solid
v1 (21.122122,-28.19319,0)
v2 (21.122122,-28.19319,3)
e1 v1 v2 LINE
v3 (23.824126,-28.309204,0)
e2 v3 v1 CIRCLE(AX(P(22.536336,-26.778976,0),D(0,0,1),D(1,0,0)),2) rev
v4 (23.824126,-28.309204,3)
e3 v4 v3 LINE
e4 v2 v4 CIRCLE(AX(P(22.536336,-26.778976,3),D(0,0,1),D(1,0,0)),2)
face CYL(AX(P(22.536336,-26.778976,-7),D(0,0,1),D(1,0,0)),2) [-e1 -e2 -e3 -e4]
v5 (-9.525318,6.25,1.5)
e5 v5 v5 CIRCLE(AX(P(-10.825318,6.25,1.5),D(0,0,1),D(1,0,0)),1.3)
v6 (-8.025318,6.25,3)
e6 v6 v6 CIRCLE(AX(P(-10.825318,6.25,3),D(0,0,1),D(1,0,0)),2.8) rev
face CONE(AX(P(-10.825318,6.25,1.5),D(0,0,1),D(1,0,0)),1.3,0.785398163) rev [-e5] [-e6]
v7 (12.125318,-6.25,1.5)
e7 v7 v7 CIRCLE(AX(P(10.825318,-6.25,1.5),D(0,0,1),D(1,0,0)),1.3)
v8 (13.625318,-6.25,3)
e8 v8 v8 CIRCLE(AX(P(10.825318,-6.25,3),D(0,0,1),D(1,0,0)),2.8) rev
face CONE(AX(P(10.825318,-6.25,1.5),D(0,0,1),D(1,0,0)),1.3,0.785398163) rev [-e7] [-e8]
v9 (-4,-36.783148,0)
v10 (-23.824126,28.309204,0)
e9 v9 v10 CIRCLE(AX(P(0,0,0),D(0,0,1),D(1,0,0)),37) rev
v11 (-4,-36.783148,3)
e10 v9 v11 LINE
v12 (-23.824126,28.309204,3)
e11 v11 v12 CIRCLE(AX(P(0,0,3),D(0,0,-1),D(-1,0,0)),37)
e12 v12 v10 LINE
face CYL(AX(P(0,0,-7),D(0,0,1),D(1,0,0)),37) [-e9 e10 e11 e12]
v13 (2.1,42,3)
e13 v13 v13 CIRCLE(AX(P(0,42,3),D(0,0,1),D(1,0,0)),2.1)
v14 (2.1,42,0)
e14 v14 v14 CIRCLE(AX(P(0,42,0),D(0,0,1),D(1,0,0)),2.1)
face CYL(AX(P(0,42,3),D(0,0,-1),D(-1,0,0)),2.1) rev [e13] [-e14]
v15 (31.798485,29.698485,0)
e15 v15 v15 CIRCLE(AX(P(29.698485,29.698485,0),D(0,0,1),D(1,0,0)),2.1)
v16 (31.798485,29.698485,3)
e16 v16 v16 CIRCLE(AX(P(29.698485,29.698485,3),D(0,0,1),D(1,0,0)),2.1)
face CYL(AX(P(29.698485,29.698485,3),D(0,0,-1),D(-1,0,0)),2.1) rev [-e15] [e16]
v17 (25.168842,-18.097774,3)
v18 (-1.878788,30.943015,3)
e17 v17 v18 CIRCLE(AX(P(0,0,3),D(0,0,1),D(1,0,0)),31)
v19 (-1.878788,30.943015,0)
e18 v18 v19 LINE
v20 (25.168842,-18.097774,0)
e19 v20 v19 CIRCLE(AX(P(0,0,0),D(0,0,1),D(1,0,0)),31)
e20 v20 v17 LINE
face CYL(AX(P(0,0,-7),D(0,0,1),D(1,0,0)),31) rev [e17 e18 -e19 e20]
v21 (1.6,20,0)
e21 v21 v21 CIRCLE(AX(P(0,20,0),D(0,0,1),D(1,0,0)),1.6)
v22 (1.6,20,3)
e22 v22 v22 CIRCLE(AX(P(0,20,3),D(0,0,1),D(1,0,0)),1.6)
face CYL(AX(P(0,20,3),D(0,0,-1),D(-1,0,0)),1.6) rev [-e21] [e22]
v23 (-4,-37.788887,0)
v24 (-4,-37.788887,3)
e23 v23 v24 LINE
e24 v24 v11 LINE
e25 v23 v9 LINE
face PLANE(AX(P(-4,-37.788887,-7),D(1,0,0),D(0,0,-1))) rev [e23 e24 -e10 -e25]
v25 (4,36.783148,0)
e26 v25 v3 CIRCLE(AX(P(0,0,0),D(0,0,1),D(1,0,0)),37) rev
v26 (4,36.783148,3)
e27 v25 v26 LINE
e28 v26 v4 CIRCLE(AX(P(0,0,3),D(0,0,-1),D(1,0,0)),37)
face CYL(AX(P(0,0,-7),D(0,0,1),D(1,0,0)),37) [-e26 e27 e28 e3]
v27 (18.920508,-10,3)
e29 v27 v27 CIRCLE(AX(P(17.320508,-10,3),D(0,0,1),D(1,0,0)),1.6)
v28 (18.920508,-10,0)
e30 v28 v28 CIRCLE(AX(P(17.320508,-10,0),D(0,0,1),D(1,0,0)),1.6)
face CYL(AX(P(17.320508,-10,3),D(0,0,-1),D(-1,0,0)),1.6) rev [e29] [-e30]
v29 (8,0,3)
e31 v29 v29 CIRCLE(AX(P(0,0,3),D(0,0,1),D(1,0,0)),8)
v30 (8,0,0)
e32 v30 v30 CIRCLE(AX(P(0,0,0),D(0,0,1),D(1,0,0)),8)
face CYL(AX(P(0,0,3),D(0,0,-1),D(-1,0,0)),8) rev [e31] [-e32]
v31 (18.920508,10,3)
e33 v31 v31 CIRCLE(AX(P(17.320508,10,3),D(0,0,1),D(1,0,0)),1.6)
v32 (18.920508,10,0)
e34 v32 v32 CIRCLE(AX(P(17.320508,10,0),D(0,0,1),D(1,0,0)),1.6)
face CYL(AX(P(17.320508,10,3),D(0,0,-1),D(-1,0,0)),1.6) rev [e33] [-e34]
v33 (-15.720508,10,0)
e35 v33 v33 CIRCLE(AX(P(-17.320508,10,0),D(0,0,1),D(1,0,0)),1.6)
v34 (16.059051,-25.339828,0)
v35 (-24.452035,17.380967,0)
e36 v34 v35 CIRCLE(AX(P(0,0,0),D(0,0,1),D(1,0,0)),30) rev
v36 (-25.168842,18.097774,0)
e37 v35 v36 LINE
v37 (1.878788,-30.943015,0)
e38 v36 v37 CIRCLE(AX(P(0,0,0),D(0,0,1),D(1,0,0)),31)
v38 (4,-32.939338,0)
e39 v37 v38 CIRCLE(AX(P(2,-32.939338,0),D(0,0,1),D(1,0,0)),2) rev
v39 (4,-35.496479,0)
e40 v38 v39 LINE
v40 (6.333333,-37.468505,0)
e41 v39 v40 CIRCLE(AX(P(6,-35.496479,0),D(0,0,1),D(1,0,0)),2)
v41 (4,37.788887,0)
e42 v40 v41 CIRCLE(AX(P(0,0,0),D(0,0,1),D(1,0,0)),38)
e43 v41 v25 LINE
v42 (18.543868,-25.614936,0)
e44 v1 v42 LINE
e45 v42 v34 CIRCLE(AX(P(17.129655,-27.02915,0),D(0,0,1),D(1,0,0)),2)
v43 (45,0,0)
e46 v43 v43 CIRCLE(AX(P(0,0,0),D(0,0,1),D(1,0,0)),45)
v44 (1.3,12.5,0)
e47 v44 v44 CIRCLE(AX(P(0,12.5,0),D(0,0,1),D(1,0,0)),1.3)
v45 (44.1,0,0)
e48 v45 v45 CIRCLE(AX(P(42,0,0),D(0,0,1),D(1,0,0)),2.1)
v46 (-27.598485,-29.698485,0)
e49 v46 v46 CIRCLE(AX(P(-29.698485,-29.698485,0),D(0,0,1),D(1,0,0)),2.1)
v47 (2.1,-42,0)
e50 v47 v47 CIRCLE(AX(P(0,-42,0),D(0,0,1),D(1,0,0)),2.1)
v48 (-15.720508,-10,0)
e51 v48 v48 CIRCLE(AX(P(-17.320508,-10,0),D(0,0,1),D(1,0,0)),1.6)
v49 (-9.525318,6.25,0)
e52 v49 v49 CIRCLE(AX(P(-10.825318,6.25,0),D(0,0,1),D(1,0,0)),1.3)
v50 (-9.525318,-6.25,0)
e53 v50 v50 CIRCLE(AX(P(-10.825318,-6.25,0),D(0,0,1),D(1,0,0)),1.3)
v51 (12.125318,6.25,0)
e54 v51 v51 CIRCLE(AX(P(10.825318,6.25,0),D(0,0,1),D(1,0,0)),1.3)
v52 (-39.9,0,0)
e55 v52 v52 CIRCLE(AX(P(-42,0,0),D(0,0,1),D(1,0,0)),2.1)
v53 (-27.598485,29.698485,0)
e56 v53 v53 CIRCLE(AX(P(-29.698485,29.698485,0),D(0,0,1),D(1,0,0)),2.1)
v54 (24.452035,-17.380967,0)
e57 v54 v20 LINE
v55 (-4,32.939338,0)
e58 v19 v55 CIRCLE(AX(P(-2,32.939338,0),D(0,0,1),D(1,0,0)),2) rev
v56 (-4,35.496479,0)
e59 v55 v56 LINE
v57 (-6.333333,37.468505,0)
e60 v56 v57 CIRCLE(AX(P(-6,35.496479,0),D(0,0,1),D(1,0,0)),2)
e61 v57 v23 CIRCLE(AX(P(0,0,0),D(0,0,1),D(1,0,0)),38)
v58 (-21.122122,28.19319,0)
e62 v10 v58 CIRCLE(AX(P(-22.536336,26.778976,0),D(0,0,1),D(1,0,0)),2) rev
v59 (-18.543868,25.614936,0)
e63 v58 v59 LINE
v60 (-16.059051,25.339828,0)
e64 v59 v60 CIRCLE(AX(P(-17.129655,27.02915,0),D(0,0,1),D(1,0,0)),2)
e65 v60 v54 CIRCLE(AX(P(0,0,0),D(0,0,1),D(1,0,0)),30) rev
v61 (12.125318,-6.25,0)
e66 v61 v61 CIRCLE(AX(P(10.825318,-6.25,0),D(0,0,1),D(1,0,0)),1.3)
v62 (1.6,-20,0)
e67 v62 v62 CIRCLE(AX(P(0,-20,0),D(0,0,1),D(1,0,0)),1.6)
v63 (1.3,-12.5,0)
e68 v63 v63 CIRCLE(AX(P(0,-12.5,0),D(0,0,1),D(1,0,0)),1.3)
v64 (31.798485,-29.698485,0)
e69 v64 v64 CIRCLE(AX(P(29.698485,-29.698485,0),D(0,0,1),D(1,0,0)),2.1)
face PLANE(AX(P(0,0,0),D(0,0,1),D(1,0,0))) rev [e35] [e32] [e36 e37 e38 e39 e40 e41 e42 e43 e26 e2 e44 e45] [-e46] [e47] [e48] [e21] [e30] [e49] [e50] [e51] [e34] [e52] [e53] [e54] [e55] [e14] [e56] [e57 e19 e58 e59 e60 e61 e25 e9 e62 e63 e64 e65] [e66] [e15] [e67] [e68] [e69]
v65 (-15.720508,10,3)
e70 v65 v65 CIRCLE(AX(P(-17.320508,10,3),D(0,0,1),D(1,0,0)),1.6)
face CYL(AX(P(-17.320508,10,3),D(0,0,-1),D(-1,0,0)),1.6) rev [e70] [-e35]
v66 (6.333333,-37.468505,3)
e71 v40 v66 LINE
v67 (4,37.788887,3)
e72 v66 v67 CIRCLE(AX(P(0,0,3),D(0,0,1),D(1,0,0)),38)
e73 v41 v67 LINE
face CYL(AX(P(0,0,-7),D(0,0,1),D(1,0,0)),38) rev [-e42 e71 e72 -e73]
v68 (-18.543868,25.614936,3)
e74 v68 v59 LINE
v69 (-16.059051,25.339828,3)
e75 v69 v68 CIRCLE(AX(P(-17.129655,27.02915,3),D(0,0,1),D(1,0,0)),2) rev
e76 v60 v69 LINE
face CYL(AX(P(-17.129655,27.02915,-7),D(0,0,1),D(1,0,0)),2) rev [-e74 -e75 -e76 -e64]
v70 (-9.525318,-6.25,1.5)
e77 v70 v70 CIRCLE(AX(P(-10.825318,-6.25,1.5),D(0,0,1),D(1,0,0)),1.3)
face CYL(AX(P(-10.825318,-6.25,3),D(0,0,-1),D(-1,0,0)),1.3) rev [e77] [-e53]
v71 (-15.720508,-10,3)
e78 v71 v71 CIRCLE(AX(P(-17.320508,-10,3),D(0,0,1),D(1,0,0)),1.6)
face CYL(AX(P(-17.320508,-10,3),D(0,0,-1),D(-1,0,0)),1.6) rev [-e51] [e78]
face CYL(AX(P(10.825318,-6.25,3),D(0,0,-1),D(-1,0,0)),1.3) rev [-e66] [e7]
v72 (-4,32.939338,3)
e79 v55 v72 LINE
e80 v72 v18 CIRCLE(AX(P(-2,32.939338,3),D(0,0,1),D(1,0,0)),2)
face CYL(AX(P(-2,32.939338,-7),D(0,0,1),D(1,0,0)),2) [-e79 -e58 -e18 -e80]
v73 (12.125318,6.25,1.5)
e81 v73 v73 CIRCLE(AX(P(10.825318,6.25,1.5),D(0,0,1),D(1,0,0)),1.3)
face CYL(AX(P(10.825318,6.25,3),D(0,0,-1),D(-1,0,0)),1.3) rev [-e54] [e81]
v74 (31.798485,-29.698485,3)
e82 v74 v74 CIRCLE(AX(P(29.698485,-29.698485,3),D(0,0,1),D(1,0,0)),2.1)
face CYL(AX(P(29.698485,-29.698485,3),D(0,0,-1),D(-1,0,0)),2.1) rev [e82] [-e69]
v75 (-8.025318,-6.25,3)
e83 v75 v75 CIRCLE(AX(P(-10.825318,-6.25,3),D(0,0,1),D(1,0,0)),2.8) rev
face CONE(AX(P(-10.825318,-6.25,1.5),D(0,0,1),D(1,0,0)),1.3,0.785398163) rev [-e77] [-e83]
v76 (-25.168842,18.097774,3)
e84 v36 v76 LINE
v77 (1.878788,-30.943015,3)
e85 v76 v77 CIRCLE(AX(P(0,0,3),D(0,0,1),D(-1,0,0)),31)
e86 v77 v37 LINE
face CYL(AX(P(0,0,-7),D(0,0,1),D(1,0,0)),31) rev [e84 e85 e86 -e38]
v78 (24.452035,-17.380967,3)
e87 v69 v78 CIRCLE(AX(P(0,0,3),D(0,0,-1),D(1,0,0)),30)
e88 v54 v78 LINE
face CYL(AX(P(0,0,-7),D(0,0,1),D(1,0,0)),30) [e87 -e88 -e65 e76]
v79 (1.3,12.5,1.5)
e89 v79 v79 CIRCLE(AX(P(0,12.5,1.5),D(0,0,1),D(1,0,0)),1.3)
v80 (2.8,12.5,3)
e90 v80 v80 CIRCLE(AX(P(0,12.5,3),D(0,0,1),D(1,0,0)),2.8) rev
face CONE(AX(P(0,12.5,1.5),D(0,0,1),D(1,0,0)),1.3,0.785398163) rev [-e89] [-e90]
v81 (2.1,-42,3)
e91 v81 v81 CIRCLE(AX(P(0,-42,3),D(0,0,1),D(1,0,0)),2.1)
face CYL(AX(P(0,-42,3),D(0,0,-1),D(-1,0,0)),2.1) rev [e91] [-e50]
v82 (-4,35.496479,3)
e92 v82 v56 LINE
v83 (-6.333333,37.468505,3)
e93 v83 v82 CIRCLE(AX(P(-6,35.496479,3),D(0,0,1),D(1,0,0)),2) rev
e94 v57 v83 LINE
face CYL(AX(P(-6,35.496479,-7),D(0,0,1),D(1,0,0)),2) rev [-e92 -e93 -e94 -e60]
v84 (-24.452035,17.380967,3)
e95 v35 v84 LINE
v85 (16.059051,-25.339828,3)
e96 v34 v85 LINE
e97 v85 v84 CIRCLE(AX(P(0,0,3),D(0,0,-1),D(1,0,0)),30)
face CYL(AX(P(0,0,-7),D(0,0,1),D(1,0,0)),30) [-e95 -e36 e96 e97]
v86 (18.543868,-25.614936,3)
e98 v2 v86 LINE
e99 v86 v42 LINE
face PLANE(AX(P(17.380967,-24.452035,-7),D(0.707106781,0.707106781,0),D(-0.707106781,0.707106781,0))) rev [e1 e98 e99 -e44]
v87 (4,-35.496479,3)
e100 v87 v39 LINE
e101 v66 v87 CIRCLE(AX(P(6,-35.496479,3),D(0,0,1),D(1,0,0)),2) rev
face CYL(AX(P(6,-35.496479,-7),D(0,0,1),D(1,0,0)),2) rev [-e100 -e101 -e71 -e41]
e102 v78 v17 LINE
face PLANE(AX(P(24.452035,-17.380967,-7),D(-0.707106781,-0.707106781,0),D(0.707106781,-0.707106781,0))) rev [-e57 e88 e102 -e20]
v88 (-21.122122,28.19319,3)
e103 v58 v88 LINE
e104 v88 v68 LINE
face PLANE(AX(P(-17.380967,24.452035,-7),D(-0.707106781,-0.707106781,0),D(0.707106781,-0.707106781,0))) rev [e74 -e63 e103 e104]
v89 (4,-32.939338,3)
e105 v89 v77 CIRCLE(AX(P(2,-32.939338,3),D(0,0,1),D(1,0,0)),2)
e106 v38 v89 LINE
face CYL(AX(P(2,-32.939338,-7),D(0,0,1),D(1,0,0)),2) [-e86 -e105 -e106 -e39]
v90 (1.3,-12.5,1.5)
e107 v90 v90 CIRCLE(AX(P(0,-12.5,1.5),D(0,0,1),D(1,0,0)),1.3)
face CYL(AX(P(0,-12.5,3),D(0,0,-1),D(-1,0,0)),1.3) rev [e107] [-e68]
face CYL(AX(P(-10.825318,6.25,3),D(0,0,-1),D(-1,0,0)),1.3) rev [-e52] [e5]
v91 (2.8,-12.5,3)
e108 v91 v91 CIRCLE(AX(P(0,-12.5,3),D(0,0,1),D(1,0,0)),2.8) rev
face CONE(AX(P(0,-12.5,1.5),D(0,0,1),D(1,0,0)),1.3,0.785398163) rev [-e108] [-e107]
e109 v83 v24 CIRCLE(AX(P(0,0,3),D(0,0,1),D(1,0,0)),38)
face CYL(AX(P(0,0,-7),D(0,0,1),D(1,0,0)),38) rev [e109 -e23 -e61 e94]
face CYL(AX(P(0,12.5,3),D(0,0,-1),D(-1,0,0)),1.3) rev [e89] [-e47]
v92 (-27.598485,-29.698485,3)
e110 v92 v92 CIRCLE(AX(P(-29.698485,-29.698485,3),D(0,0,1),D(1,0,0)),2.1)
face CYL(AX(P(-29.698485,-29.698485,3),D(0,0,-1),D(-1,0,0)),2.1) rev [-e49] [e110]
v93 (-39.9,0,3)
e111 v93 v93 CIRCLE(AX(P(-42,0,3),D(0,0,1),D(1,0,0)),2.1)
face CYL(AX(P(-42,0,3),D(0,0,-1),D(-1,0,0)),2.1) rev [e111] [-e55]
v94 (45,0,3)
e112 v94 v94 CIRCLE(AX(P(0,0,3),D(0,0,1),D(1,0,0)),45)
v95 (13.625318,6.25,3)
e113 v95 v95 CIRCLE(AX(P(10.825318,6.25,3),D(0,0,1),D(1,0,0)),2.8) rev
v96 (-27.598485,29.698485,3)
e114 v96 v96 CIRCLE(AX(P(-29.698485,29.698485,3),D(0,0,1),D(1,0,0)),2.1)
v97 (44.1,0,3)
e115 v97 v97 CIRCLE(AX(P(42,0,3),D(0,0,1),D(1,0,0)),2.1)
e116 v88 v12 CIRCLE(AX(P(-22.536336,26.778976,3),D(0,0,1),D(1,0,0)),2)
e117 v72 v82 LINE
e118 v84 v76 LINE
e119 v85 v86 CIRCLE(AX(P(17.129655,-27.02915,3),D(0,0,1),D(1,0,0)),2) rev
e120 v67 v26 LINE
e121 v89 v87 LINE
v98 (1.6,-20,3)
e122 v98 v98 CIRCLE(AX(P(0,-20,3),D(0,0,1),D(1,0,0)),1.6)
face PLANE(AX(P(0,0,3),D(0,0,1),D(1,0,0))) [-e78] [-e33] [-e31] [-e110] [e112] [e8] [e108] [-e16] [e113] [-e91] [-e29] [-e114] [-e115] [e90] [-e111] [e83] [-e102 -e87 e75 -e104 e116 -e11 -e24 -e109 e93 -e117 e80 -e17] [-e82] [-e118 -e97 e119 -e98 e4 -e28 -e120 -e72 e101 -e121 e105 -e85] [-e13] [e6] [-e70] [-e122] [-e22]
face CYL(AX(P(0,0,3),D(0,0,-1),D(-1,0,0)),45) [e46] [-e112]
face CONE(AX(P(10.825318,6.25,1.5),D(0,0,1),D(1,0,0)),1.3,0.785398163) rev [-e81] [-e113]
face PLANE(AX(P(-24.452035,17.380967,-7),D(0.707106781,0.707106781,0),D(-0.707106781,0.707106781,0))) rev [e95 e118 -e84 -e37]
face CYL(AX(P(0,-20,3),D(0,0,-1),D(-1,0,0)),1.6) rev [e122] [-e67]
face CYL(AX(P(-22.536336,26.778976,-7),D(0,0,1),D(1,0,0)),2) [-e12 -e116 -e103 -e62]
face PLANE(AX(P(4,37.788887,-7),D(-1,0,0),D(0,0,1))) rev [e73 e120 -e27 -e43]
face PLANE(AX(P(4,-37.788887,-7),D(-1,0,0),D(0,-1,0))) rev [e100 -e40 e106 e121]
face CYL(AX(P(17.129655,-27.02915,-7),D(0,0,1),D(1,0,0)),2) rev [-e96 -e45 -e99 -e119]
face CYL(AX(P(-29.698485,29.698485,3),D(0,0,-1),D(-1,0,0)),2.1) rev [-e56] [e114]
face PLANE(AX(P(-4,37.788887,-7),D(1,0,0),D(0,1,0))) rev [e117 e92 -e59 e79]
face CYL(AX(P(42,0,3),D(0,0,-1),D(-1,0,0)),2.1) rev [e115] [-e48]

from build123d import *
from build123d.topology import SkipClean

# Parameters (mm, degrees)
EXTRUDE_1_OUTLINE_R      = 45
EXTRUDE_1_OUTLINE_R_2    = 2.1
EXTRUDE_1_OUTLINE_R_3    = 1.6
EXTRUDE_1_OUTLINE_R_4    = 1.3
EXTRUDE_1_OUTLINE_R_5    = 8
EXTRUDE_1_DEPTH          = 3
CUT_EXTRUDE_1_DEPTH      = 10
PATTERN_CIRCULAR_1_COUNT = 2
CUT_EXTRUDE_2_DEPTH      = 10
FILLET_1_R               = 2
CHAMFER_1_SIZE           = 1.5


# Read off the part's stored shape, not the designer's step: 凸台-拉伸1
with BuildPart() as part:
    # 凸台-拉伸1 outline → 凸台-拉伸1 (new body)
    with BuildSketch(Plane.XY):
        Circle(EXTRUDE_1_OUTLINE_R)
        with Locations((-29.69848481, -29.69848481)):
            Circle(EXTRUDE_1_OUTLINE_R_2, mode=Mode.SUBTRACT)
        with Locations((-17.320508076, -10)):
            Circle(EXTRUDE_1_OUTLINE_R_3, mode=Mode.SUBTRACT)
        with Locations((-10.825317547, -6.25)):
            Circle(EXTRUDE_1_OUTLINE_R_4, mode=Mode.SUBTRACT)
        with Locations((0, -42)):
            Circle(EXTRUDE_1_OUTLINE_R_2, mode=Mode.SUBTRACT)
        with Locations((29.69848481, -29.69848481)):
            Circle(EXTRUDE_1_OUTLINE_R_2, mode=Mode.SUBTRACT)
        with Locations((0, -20)):
            Circle(EXTRUDE_1_OUTLINE_R_3, mode=Mode.SUBTRACT)
        with Locations((0, -12.5)):
            Circle(EXTRUDE_1_OUTLINE_R_4, mode=Mode.SUBTRACT)
        with Locations((10.825317547, -6.25)):
            Circle(EXTRUDE_1_OUTLINE_R_4, mode=Mode.SUBTRACT)
        with Locations((17.320508076, -10)):
            Circle(EXTRUDE_1_OUTLINE_R_3, mode=Mode.SUBTRACT)
        with Locations((-42, 0)):
            Circle(EXTRUDE_1_OUTLINE_R_2, mode=Mode.SUBTRACT)
        with Locations((-17.320508076, 10)):
            Circle(EXTRUDE_1_OUTLINE_R_3, mode=Mode.SUBTRACT)
        with Locations((-10.825317547, 6.25)):
            Circle(EXTRUDE_1_OUTLINE_R_4, mode=Mode.SUBTRACT)
        with Locations((-29.69848481, 29.69848481)):
            Circle(EXTRUDE_1_OUTLINE_R_2, mode=Mode.SUBTRACT)
        Circle(EXTRUDE_1_OUTLINE_R_5, mode=Mode.SUBTRACT)
        with Locations((10.825317547, 6.25)):
            Circle(EXTRUDE_1_OUTLINE_R_4, mode=Mode.SUBTRACT)
        with Locations((17.320508076, 10)):
            Circle(EXTRUDE_1_OUTLINE_R_3, mode=Mode.SUBTRACT)
        with Locations((0, 12.5)):
            Circle(EXTRUDE_1_OUTLINE_R_4, mode=Mode.SUBTRACT)
        with Locations((0, 20)):
            Circle(EXTRUDE_1_OUTLINE_R_3, mode=Mode.SUBTRACT)
        with Locations((42, 0)):
            Circle(EXTRUDE_1_OUTLINE_R_2, mode=Mode.SUBTRACT)
        with Locations((0, 42)):
            Circle(EXTRUDE_1_OUTLINE_R_2, mode=Mode.SUBTRACT)
        with Locations((29.69848481, 29.69848481)):
            Circle(EXTRUDE_1_OUTLINE_R_2, mode=Mode.SUBTRACT)
    extrude(amount=EXTRUDE_1_DEPTH)

    # 草图2 → 切除-拉伸1 (cut)
    with BuildSketch(Plane.XY.offset(3)):
        with BuildLine():
            Line((4, 37.788887255), (4, 36.783148315))
            ThreePointArc((4, 36.783148315), (35.651970274, 9.896313233), (22.387428888, -29.4584967))
            Line((22.387428888, -29.4584967), (17.380966757, -24.452034569))
            ThreePointArc((17.380966757, -24.452034569), (16.963906124, -24.743198844), (16.541969004, -25.027250378))
            Line((16.541969004, -25.027250378), (22.290357636, -30.77563901))
            ThreePointArc((22.290357636, -30.77563901), (36.716063128, 9.794422308), (4, 37.788887255))
        make_face()
        with BuildLine():
            Line((-4, 37.788887255), (-4, 30.740852298))
            ThreePointArc((-4, 30.740852298), (26.614522572, 15.895508431), (25.168841559, -18.097773747))
            Line((25.168841559, -18.097773747), (24.452034569, -17.380966757))
            ThreePointArc((24.452034569, -17.380966757), (25.41530796, 15.93932625), (-5, 29.580398915))
            Line((-5, 29.580398915), (-5, 37.669616404))
            ThreePointArc((-5, 37.669616404), (-4.500395136, 37.732564763), (-4, 37.788887255))
        make_face()
    cut_extrude_1 = extrude(amount=-CUT_EXTRUDE_1_DEPTH, mode=Mode.SUBTRACT)

    # 阵列(圆周)1: 切除-拉伸1 ×2 about axis
    pattern_circular_1_axis = Axis((0, 0, 0), (0, 0, 1))
    for i in range(1, PATTERN_CIRCULAR_1_COUNT):
        add(cut_extrude_1.rotate(pattern_circular_1_axis, i * 360 / PATTERN_CIRCULAR_1_COUNT), mode=Mode.SUBTRACT)

    # 草图3 → 切除-拉伸2 (cut)
    with SkipClean():  # the faces are left unmerged after this step: merging them gives an invalid solid
        with BuildSketch(Plane.XY.offset(3)):
            with BuildLine():
                Line((-5, 37.669616404), (-5, 29.580398915))
                ThreePointArc((-5, 29.580398915), (-11.00894625, 27.907043958), (-16.541969004, 25.027250378))
                Line((-16.541969004, 25.027250378), (-22.290357636, 30.77563901))
                ThreePointArc((-22.290357636, 30.77563901), (-14.073828052, 35.297696298), (-5, 37.669616404))
            make_face()
            with BuildLine():
                Line((16.541969004, -25.027250378), (22.290357636, -30.77563901))
                ThreePointArc((22.290357636, -30.77563901), (14.073828052, -35.297696298), (5, -37.669616404))
                Line((5, -37.669616404), (5, -29.580398915))
                ThreePointArc((5, -29.580398915), (11.00894625, -27.907043958), (16.541969004, -25.027250378))
            make_face()
        extrude(amount=-CUT_EXTRUDE_2_DEPTH, mode=Mode.SUBTRACT)

    # 圆角1
    fillet_1_edges = [part.edges().sort_by_distance(p)[0] for p in [
        (-4, 37.788887255, 1.5),
        (-4, 30.740852298, 1.5),
        (17.380966757, -24.452034569, 1.5),
        (22.387428888, -29.4584967, 1.5),
        (4, -37.788887255, 1.5),
        (4, -30.740852298, 1.5),
        (-17.380966757, 24.452034569, 1.5),
        (-22.387428888, 29.4584967, 1.5),
    ]]
    fillet(fillet_1_edges, radius=FILLET_1_R)

    # 倒角1
    chamfer_1_edges = [part.edges().sort_by_distance(p)[0] for p in [
        (-1.3, 12.5, 3),
        (9.525317547, 6.25, 3),
        (9.525317547, -6.25, 3),
        (-1.3, -12.5, 3),
        (-12.125317547, -6.25, 3),
        (-12.125317547, 6.25, 3),
    ]]
    chamfer(chamfer_1_edges, length=CHAMFER_1_SIZE)


solid = part.part
